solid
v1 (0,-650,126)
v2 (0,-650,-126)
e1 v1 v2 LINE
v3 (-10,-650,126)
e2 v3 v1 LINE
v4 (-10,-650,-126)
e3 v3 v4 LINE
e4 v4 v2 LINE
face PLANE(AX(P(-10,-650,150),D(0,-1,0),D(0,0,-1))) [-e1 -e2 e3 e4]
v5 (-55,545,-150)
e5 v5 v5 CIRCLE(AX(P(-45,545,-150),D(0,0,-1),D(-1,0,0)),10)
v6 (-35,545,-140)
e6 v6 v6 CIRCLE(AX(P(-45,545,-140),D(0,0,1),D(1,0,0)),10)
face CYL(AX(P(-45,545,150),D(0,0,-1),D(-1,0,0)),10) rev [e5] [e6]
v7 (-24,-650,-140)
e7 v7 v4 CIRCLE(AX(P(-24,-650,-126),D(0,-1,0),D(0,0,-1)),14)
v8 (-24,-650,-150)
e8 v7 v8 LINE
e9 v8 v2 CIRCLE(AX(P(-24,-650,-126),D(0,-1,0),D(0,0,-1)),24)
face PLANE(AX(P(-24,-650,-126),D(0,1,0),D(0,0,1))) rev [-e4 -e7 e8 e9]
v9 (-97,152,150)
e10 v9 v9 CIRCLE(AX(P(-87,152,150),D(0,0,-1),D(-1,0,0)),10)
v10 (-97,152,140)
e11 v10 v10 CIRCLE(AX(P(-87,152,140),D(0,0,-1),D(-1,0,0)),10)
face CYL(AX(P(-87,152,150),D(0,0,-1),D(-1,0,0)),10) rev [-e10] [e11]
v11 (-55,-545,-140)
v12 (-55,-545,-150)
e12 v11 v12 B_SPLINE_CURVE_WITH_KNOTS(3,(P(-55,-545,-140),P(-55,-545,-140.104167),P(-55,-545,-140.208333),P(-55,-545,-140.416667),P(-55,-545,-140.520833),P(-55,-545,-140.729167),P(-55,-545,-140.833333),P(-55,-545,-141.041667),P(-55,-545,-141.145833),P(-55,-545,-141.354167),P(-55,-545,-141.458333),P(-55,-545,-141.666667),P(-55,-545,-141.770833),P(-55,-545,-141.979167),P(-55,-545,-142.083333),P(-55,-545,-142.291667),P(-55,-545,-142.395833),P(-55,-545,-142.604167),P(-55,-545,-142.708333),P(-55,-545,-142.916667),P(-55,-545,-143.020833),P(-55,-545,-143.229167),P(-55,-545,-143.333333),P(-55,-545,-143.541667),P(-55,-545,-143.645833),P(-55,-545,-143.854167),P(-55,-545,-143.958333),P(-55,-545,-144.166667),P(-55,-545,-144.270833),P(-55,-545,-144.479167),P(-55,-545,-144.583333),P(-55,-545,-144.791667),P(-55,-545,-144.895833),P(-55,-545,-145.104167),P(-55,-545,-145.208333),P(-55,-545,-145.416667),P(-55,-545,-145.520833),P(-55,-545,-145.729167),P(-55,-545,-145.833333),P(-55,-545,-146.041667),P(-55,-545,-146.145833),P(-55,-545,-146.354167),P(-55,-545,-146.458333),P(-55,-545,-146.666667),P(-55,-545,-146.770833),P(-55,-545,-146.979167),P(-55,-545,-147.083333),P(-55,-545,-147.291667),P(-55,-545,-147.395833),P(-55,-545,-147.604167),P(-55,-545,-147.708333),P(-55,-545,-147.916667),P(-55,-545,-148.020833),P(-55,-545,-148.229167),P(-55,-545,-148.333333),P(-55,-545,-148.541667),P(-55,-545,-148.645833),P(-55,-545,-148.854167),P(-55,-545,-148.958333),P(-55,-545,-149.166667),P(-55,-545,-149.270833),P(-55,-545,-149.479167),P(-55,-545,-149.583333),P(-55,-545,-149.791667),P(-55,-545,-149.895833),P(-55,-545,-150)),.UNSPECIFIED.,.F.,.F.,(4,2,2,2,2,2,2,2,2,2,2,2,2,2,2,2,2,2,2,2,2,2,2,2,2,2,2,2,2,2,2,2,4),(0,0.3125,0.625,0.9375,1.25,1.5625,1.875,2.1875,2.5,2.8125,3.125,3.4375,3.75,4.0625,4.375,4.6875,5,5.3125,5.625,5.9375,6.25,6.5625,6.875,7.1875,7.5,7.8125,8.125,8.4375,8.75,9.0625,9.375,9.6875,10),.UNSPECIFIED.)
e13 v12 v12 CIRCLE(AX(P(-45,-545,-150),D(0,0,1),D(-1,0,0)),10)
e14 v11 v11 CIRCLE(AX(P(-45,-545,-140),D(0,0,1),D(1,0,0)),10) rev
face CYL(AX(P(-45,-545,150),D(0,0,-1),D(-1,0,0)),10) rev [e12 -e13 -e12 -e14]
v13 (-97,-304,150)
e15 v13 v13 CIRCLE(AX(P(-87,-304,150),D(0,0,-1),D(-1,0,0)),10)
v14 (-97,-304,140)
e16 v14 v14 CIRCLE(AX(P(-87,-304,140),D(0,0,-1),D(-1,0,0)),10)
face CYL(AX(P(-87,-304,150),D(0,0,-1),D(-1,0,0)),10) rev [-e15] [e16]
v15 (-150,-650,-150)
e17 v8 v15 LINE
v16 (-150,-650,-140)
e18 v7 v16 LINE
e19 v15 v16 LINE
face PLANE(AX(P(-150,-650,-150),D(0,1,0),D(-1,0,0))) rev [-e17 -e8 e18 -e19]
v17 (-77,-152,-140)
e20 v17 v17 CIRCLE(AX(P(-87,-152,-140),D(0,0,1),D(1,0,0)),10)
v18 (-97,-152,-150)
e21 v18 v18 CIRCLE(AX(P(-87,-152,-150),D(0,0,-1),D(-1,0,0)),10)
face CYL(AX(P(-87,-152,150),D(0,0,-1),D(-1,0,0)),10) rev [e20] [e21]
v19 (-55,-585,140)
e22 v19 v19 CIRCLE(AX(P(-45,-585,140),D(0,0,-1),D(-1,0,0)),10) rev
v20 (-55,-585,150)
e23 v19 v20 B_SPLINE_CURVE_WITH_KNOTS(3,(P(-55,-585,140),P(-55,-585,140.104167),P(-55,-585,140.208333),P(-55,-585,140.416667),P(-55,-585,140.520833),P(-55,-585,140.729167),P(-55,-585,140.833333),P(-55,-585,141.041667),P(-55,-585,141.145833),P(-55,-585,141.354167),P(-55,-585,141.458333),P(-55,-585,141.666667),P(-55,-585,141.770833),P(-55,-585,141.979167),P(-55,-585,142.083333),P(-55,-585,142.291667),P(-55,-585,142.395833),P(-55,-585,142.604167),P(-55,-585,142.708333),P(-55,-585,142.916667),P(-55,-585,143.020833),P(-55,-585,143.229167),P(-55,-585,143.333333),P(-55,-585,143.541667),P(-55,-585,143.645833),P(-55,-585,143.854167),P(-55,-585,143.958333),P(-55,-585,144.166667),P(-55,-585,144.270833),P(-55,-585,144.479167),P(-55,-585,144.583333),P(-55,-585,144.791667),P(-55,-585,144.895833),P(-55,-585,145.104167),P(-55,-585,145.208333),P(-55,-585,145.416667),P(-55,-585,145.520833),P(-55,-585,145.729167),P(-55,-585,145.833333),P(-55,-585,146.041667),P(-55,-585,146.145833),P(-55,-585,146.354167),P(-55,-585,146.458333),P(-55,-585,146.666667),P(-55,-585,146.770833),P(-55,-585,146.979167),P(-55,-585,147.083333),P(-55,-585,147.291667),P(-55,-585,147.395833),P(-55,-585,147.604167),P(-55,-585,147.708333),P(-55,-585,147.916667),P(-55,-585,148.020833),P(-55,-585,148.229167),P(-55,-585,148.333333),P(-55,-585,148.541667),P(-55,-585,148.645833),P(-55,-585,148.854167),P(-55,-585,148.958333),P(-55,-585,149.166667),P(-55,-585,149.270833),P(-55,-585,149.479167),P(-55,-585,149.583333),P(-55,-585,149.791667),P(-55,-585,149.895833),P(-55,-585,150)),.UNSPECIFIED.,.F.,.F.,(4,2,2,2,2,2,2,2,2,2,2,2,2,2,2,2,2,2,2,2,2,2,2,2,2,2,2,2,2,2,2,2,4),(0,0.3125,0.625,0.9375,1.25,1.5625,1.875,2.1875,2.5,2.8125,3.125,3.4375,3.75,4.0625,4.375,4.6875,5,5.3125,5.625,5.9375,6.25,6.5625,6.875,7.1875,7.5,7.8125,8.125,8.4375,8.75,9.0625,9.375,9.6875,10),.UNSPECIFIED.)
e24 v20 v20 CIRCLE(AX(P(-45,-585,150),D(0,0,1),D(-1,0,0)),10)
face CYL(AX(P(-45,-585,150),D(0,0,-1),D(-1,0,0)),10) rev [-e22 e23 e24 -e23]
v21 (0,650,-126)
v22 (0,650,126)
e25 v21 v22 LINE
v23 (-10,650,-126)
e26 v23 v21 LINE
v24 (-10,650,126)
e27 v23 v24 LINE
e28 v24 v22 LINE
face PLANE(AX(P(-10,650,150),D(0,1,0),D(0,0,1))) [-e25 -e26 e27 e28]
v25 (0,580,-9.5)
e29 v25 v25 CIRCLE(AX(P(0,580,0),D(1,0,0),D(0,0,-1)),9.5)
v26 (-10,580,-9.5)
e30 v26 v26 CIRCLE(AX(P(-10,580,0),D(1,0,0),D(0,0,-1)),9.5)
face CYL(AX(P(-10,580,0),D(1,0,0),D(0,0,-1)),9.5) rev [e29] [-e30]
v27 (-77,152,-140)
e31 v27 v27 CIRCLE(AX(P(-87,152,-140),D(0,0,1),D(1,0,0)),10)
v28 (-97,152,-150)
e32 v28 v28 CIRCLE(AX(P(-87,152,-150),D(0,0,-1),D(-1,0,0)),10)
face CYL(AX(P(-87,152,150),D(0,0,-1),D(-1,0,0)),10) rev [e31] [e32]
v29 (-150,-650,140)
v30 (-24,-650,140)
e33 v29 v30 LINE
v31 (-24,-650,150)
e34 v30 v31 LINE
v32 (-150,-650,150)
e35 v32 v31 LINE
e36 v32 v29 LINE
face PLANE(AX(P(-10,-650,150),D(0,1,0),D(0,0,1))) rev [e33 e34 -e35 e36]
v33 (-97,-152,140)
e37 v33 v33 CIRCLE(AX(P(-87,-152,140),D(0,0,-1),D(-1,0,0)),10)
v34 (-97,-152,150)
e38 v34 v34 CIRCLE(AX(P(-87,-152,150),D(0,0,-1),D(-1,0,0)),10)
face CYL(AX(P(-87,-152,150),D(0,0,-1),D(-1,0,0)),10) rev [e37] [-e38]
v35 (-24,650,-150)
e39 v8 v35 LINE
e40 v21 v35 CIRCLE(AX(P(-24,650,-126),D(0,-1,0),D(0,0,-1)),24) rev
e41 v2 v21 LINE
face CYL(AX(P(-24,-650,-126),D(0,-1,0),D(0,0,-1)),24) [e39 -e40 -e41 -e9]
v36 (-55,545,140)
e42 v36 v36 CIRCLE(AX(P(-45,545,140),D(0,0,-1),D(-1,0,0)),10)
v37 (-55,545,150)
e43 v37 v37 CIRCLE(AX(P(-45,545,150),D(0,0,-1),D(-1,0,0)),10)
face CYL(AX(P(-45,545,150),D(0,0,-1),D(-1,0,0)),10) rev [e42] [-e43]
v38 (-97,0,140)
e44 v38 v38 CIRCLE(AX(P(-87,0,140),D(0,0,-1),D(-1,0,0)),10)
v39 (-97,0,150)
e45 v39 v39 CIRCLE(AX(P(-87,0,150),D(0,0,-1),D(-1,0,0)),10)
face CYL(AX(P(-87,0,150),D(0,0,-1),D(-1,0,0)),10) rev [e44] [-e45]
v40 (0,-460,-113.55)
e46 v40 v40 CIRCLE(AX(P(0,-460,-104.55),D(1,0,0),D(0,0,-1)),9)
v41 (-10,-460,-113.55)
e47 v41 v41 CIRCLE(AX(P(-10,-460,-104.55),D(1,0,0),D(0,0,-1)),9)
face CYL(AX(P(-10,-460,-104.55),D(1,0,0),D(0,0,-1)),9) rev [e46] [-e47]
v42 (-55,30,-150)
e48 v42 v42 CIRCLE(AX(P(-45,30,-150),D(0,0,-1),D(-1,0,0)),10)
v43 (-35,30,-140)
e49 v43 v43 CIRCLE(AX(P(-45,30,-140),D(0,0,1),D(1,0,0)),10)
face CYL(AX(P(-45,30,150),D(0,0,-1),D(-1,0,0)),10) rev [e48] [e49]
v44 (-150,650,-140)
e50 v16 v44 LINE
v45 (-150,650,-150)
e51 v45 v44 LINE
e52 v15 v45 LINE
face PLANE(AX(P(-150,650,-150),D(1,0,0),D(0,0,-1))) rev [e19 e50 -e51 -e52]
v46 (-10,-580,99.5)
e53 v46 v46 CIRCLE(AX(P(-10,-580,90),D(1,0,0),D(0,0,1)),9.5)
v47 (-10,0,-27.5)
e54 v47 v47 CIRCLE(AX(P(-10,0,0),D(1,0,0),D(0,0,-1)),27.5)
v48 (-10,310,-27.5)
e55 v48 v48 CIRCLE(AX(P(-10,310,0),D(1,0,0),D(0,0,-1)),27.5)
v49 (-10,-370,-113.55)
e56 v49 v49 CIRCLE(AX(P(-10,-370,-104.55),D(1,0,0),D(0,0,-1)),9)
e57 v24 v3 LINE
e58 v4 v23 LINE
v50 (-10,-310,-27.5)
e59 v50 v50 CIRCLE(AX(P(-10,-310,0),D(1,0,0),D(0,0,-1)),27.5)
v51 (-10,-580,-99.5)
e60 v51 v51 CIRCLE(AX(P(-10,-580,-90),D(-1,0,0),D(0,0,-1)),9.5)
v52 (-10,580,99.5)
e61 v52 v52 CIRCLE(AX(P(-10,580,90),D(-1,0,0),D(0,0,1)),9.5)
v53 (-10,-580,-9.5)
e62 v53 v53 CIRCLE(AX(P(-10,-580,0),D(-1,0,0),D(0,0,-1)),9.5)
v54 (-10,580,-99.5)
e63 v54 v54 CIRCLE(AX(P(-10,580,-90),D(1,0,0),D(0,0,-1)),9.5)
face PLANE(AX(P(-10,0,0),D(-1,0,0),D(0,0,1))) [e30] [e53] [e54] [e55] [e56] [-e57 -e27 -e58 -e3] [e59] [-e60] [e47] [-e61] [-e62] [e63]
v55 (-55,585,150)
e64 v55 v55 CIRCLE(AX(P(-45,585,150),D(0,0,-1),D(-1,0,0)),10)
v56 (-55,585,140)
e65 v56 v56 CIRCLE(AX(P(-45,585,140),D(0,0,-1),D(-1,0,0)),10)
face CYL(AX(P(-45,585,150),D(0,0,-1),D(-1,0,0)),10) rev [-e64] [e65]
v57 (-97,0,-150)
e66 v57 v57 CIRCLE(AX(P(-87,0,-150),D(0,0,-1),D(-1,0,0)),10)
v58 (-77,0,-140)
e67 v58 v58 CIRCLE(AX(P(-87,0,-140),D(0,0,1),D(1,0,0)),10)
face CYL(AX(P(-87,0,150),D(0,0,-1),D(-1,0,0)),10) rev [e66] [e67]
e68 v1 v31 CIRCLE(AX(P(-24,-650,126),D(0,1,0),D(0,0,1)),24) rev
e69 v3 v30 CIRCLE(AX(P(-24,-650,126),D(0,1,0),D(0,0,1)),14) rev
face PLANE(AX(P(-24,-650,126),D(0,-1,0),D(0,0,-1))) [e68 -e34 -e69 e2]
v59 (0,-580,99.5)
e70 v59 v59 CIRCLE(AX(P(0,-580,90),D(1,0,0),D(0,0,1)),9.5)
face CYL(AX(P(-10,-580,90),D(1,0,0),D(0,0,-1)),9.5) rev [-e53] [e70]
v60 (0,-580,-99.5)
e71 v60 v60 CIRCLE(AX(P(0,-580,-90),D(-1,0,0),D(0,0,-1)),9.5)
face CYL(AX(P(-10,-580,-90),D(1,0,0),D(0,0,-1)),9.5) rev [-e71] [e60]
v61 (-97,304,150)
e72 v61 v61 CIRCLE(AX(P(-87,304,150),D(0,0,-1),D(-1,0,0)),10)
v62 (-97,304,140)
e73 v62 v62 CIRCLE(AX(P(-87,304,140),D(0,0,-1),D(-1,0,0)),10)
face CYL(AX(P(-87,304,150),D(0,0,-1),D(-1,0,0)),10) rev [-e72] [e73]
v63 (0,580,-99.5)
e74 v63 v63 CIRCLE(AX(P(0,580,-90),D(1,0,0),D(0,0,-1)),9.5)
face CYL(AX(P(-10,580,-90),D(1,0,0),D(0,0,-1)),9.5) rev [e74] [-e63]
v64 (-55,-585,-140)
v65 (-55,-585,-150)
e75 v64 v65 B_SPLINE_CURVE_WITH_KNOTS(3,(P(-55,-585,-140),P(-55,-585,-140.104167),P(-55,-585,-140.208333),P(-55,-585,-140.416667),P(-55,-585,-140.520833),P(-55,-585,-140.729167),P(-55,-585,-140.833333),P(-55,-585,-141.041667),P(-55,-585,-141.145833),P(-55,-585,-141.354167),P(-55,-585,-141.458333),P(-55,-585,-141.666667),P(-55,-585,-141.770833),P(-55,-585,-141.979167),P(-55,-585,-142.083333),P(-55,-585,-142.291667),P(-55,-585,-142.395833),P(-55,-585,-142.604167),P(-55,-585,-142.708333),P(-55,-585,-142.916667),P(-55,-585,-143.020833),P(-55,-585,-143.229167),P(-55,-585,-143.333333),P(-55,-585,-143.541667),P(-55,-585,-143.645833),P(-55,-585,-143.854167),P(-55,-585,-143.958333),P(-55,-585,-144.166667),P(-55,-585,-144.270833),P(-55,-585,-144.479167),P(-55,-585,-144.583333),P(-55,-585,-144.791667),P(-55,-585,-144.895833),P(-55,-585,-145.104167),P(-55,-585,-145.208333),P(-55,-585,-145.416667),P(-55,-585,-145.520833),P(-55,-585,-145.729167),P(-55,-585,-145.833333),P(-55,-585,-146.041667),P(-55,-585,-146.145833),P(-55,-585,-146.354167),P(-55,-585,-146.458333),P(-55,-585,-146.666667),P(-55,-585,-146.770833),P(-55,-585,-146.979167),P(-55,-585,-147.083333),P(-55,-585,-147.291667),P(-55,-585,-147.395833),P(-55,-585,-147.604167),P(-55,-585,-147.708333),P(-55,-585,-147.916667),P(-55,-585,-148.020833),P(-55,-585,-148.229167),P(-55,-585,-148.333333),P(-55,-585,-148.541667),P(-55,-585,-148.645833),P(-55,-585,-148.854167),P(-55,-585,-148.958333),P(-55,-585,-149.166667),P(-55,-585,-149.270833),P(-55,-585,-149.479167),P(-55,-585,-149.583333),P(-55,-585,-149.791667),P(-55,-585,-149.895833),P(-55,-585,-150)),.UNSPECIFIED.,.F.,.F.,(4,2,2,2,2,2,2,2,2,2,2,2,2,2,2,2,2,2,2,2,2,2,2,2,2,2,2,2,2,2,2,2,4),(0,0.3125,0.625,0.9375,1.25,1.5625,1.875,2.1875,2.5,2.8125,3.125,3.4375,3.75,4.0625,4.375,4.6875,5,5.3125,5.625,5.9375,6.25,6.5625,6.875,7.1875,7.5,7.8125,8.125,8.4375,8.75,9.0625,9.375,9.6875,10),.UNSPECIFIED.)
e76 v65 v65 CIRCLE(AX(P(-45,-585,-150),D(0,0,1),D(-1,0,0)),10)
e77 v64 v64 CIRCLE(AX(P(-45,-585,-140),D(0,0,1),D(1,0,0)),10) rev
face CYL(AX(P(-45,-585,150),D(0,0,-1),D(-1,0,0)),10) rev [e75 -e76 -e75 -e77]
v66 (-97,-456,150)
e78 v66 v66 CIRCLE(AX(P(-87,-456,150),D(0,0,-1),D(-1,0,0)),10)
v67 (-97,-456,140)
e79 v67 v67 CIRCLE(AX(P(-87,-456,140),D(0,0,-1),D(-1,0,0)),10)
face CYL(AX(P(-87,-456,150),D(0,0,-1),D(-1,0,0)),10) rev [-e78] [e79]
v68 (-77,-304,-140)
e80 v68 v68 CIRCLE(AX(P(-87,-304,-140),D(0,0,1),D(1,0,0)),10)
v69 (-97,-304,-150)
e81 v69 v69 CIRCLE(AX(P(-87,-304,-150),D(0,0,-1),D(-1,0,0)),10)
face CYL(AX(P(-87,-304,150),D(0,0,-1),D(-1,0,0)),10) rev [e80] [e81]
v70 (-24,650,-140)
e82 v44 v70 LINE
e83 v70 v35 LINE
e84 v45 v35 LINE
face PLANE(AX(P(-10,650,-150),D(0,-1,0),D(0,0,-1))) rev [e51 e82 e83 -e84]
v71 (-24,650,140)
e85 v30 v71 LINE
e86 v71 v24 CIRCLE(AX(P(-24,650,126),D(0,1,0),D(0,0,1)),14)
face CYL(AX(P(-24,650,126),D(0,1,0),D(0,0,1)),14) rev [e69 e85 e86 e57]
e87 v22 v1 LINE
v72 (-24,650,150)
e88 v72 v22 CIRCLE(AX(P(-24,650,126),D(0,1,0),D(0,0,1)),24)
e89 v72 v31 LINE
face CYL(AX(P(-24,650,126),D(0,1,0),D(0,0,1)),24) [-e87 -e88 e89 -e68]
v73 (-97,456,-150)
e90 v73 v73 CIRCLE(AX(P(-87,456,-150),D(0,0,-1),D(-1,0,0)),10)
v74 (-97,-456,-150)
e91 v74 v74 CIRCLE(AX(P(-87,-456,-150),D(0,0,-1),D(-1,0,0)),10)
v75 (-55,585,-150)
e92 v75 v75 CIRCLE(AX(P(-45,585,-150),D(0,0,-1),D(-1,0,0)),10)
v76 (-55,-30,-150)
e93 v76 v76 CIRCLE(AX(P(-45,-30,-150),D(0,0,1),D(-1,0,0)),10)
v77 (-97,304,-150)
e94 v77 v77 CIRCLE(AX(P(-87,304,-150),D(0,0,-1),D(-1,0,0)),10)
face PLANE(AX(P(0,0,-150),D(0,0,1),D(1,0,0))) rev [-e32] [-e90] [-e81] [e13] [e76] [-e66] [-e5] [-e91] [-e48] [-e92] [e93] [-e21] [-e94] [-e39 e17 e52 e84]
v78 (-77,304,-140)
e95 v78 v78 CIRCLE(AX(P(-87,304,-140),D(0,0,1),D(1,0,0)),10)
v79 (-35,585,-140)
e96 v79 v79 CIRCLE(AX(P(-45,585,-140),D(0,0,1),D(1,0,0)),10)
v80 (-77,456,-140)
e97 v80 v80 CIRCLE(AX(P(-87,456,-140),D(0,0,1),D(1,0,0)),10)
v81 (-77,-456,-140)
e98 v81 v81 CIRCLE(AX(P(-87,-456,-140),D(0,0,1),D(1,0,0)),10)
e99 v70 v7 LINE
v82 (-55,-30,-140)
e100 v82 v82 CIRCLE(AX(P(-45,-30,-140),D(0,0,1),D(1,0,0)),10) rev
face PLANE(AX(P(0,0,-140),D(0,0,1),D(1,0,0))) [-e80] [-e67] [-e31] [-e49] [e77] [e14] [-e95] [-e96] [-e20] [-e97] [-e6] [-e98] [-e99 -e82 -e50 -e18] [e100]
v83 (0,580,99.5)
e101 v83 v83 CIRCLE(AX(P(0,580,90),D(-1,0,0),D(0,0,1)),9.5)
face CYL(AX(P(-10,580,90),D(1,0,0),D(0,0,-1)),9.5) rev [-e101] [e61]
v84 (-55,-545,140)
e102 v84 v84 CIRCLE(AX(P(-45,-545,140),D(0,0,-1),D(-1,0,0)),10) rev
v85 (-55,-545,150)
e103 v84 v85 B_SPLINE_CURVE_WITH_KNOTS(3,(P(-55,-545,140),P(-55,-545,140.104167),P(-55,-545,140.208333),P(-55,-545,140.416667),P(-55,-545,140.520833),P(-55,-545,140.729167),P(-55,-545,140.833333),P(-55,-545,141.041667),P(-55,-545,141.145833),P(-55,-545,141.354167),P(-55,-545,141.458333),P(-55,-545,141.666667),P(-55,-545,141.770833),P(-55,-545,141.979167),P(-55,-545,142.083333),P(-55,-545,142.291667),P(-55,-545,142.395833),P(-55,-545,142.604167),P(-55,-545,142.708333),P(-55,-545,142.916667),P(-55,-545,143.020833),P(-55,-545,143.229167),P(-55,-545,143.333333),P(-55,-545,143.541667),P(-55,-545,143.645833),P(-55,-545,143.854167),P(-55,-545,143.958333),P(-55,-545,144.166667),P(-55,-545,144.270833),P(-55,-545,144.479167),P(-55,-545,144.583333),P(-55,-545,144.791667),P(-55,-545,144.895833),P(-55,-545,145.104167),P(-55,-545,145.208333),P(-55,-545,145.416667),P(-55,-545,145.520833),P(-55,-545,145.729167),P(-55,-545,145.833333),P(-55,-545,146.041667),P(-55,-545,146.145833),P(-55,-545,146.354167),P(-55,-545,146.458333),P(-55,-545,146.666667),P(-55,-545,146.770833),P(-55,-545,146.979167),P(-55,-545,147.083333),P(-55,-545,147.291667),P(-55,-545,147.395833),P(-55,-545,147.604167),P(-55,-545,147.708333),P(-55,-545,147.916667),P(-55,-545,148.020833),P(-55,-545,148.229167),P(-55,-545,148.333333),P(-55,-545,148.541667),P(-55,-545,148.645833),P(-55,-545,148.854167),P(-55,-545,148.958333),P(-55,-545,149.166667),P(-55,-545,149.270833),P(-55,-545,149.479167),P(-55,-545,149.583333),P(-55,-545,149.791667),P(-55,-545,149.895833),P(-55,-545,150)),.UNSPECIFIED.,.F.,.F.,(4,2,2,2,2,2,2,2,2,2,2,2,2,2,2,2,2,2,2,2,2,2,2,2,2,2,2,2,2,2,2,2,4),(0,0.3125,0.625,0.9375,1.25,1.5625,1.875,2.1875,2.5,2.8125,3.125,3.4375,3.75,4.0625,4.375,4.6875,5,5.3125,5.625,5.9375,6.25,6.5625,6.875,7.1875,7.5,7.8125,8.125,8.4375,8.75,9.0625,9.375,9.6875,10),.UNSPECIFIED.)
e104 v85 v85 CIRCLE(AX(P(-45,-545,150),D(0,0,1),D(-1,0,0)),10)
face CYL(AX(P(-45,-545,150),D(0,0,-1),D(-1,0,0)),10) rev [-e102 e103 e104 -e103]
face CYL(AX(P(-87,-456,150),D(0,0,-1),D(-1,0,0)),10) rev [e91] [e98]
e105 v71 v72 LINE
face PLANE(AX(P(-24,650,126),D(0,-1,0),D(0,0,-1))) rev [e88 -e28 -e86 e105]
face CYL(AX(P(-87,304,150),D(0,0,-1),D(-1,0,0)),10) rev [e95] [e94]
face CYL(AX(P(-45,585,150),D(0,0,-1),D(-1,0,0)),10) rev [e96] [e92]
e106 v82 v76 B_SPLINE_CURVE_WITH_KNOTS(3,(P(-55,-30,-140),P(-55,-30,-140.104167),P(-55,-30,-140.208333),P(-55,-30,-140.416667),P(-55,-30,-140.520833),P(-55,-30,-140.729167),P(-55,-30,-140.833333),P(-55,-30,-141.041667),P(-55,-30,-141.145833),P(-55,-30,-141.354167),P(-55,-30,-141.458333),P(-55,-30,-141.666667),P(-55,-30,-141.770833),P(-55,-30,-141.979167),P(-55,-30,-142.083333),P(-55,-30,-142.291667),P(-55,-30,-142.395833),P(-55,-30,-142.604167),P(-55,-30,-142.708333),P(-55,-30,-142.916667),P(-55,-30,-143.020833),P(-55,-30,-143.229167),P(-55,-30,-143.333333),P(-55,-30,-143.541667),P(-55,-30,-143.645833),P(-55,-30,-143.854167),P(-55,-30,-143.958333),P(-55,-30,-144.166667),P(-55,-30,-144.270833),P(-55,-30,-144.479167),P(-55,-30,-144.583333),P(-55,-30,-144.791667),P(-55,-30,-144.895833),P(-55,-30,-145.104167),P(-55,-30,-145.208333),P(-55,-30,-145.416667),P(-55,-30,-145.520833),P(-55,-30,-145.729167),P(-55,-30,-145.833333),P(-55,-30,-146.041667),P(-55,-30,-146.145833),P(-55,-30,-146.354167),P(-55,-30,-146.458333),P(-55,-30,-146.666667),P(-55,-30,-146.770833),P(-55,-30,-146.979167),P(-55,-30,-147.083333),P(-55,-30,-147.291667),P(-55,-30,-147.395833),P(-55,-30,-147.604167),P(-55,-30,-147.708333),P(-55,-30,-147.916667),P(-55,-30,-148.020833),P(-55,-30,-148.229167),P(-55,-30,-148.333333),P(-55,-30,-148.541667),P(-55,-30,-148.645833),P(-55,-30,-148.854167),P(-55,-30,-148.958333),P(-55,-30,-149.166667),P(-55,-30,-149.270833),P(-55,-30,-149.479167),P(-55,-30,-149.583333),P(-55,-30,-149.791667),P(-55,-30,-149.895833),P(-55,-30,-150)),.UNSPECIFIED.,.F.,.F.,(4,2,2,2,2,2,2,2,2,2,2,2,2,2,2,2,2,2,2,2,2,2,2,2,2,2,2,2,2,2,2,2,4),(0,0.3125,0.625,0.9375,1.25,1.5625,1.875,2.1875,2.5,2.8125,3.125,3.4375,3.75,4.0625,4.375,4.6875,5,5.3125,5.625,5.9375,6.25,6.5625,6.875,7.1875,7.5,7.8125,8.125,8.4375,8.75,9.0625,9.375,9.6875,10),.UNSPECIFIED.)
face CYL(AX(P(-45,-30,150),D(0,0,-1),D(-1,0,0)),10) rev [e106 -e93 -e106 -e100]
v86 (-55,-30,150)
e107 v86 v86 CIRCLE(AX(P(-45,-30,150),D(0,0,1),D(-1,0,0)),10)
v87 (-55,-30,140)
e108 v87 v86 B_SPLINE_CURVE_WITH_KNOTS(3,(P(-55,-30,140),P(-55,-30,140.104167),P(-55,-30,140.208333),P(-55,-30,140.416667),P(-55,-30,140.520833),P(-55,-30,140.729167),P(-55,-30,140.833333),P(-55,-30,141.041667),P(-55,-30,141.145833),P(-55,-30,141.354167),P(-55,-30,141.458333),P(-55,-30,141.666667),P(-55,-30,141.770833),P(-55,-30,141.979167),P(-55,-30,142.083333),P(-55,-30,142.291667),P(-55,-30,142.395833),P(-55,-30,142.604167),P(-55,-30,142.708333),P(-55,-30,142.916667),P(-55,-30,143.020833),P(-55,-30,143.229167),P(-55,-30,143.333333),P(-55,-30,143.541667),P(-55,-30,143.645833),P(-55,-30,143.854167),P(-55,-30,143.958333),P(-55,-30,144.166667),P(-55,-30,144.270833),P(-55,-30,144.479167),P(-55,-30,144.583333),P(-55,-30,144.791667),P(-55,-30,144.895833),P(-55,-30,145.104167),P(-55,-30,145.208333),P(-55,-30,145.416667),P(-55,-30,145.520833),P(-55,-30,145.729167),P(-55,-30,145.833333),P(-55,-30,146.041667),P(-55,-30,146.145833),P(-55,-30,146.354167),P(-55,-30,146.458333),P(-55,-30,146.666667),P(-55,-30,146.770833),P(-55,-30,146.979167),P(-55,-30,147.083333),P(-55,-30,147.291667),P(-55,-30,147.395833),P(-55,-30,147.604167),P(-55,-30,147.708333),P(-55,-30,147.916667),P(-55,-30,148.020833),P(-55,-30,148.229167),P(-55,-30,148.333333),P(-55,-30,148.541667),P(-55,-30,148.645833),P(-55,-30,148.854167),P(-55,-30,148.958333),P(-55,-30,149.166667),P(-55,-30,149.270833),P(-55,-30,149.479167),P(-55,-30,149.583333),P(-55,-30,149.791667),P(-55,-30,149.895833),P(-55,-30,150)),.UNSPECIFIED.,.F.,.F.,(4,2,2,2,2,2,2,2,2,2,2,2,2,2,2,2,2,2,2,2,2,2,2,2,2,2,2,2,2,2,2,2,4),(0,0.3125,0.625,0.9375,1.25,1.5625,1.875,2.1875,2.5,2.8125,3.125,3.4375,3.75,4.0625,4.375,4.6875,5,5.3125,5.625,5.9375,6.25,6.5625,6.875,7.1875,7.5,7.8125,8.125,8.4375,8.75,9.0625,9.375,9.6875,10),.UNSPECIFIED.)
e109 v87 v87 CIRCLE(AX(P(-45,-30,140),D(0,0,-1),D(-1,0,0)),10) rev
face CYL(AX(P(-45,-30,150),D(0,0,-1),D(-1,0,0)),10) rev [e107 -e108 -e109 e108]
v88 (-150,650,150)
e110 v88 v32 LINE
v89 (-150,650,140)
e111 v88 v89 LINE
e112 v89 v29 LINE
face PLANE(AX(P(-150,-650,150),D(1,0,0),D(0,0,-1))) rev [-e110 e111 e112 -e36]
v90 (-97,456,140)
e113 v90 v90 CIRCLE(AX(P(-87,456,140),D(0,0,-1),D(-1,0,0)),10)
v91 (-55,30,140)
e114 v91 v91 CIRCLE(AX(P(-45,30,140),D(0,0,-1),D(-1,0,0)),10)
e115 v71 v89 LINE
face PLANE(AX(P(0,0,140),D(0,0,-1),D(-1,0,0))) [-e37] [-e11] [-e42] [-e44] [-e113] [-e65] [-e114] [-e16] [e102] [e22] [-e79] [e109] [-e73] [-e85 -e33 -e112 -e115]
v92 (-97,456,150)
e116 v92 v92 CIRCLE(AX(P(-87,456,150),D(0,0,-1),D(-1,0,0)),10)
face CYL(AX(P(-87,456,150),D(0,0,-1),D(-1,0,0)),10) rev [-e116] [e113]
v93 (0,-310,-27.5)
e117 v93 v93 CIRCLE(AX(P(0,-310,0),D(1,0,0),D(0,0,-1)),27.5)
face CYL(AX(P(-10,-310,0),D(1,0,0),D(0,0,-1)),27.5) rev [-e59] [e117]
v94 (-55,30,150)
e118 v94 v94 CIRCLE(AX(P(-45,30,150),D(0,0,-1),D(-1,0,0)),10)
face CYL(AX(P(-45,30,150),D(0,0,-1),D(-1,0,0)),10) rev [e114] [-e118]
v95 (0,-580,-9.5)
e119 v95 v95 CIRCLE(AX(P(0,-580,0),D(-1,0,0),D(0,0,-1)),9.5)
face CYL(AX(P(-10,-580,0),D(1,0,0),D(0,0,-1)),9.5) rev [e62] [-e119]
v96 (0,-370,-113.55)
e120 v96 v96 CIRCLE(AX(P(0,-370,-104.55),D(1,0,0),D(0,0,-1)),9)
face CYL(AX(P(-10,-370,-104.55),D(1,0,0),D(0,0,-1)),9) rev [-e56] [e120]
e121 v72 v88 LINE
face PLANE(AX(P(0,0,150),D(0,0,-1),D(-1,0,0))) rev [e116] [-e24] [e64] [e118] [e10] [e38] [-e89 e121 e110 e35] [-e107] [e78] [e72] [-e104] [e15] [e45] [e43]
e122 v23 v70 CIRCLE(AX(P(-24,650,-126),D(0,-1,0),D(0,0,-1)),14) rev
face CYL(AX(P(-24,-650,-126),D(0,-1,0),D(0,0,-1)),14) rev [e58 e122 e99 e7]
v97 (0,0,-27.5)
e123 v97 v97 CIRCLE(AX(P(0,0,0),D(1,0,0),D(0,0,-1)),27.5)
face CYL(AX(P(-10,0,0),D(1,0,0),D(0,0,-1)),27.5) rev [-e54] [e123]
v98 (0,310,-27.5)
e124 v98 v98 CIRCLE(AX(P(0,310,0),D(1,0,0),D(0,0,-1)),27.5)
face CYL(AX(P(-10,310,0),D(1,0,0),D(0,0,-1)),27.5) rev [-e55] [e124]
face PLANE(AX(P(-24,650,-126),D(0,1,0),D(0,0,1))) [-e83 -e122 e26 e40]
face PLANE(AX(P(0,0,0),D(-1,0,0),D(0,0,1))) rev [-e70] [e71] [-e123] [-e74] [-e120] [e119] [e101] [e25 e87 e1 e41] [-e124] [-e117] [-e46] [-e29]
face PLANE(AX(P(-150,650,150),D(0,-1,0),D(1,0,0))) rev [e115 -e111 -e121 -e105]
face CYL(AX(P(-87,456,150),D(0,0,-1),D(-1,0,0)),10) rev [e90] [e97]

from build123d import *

# Parameters (mm, degrees)
SKETCH1_W                      = 300
SKETCH1_H                      = 1300
BASE_FLANGE1_DEPTH             = 10
EDGE_FLANGE1_STRIP_W           = 68
EDGE_FLANGE1_STRIP_H           = 10
EDGE_FLANGE1_STRIP_CUT_DEPTH   = 1300
EDGE_FLANGE1_STRIP_2_W         = 68
EDGE_FLANGE1_STRIP_2_H         = 10
EDGE_FLANGE1_STRIP_CUT_2_DEPTH = 1300
EDGE_FLANGE1_DEPTH             = 1300
EDGE_FLANGE1_BEND_DEPTH        = 1300
SKETCH12_R                     = 9.5
CUT_EXTRUDE1_DEPTH             = 10
MIRROR2_COPY_1_SKETCH_R        = 9.5
MIRROR2_COPY_1_DEPTH           = 10
SKETCH13_R                     = 27.5
CUT_EXTRUDE2_DEPTH             = 10
LPATTERN1_COUNT                = 3
LPATTERN1_PITCH                = 310
SKETCH14_R                     = 10
CUT_EXTRUDE3_DEPTH             = 732.436941916
LPATTERN2_COUNT                = 7
LPATTERN2_PITCH                = 152
SKETCH18_R                     = 10
CUT_EXTRUDE4_DEPTH             = 732.436941916
SKETCH20_R                     = 9
CUT_EXTRUDE5_DEPTH             = 10


# Sheet-metal steps are written as plain solids
with BuildPart() as part:
    # Sketch1 → Base-Flange1 (new body)
    with BuildSketch(Plane(origin=(0, 0, 0), x_dir=(0, 0, -1), z_dir=(1, 0, 0))):
        Rectangle(SKETCH1_W, SKETCH1_H)
    extrude(amount=-BASE_FLANGE1_DEPTH)

    # Edge-Flange1 strip (across the edge) → Edge-Flange1 strip cut (cut)
    with BuildSketch(Plane(origin=(-10, -650, 150), x_dir=(0, 0, -1), z_dir=(0, 1, 0))):
        with Locations((-10, -5)):
            Rectangle(EDGE_FLANGE1_STRIP_W, EDGE_FLANGE1_STRIP_H)
    extrude(amount=EDGE_FLANGE1_STRIP_CUT_DEPTH, mode=Mode.SUBTRACT)

    # Edge-Flange1 strip 2 (across the edge) → Edge-Flange1 strip cut 2 (cut)
    with BuildSketch(Plane(origin=(-10, 650, -150), x_dir=(0, 0, 1), z_dir=(0, -1, 0))):
        with Locations((-10, -5)):
            Rectangle(EDGE_FLANGE1_STRIP_2_W, EDGE_FLANGE1_STRIP_2_H)
    extrude(amount=EDGE_FLANGE1_STRIP_CUT_2_DEPTH, mode=Mode.SUBTRACT)

    # Edge-Flange1 section (across the edge) → Edge-Flange1 (add)
    with BuildSketch(Plane(origin=(-10, -650, 150), x_dir=(0, 0, -1), z_dir=(0, 1, 0))):
        with BuildLine():
            Line((0, 14), (0, 140))
            Line((0, 140), (10, 140))
            Line((10, 140), (10, 14))
            ThreePointArc((10, 14), (14.100505063, 4.100505063), (24, 0))
            Line((24, 0), (24, -10))
            ThreePointArc((24, -10), (7.029437252, -2.970562748), (0, 14))
        make_face()
    extrude(amount=EDGE_FLANGE1_DEPTH)

    # Edge-Flange1 section 2 (across the edge) → Edge-Flange1 bend (add)
    with BuildSketch(Plane(origin=(-10, 650, -150), x_dir=(0, 0, 1), z_dir=(0, -1, 0))):
        with BuildLine():
            Line((0, 14), (0, 140))
            Line((0, 140), (10, 140))
            Line((10, 140), (10, 14))
            ThreePointArc((10, 14), (14.100505063, 4.100505063), (24, 0))
            Line((24, 0), (24, -10))
            ThreePointArc((24, -10), (7.029437252, -2.970562748), (0, 14))
        make_face()
    extrude(amount=EDGE_FLANGE1_BEND_DEPTH)

    # Sketch12 → Cut-Extrude1 (cut)
    with BuildSketch(Plane(origin=(0, 0, 0), x_dir=(0, 0, -1), z_dir=(1, 0, 0))):
        with Locations((90, 580)):
            Circle(SKETCH12_R)
        with Locations((0, 580)):
            Circle(SKETCH12_R)
    cut_extrude1 = extrude(amount=-CUT_EXTRUDE1_DEPTH, mode=Mode.SUBTRACT)

    # Mirror1: Cut-Extrude1 across plane
    add(cut_extrude1.mirror(Plane.ZX), mode=Mode.SUBTRACT)

    # Mirror2: Cut-Extrude1 across plane
    add(cut_extrude1.mirror(Plane.XY), mode=Mode.SUBTRACT)

    # Mirror2 copy 1 sketch → Mirror2 copy 1 (cut)
    with BuildSketch(Plane(origin=(0, 0, 0), x_dir=(0, 0, 1), z_dir=(1, 0, 0))):
        with Locations((90, 580)):
            Circle(MIRROR2_COPY_1_SKETCH_R)
        with Locations((0, 580)):
            Circle(MIRROR2_COPY_1_SKETCH_R)
    extrude(amount=-MIRROR2_COPY_1_DEPTH, mode=Mode.SUBTRACT)

    # Sketch13 → Cut-Extrude2 (cut)
    with BuildSketch(Plane(origin=(0, 0, 0), x_dir=(0, 0, -1), z_dir=(1, 0, 0))):
        with Locations((0, 310)):
            Circle(SKETCH13_R)
    cut_extrude2 = extrude(amount=-CUT_EXTRUDE2_DEPTH, mode=Mode.SUBTRACT)

    # LPattern1: Cut-Extrude2 ×3
    with Locations(*[(0, -i * LPATTERN1_PITCH, 0) for i in range(1, LPATTERN1_COUNT)]):
        add(cut_extrude2, mode=Mode.SUBTRACT)

    # Sketch14 → Cut-Extrude3 (cut, through all)
    with BuildSketch(Plane(origin=(0, 0, -150), x_dir=(-1, 0, 0), z_dir=(0, 0, -1))):
        with Locations((87, -456)):
            Circle(SKETCH14_R)
    cut_extrude3 = extrude(amount=-CUT_EXTRUDE3_DEPTH, mode=Mode.SUBTRACT)

    # LPattern2: Cut-Extrude3 ×7
    with Locations(*[(0, i * LPATTERN2_PITCH, 0) for i in range(1, LPATTERN2_COUNT)]):
        add(cut_extrude3, mode=Mode.SUBTRACT)

    # Sketch18 → Cut-Extrude4 (cut, through all)
    with BuildSketch(Plane(origin=(0, 0, -150), x_dir=(-1, 0, 0), z_dir=(0, 0, -1))):
        with Locations((45, 545)):
            Circle(SKETCH18_R)
        with Locations((45, 585)):
            Circle(SKETCH18_R)
        with Locations((45, 30)):
            Circle(SKETCH18_R)
    cut_extrude4 = extrude(amount=-CUT_EXTRUDE4_DEPTH, mode=Mode.SUBTRACT)

    # Mirror3: Cut-Extrude4 across plane
    add(cut_extrude4.mirror(Plane.ZX), mode=Mode.SUBTRACT)

    # Sketch20 → Cut-Extrude5 (cut)
    with BuildSketch(Plane(origin=(0, 0, 0), x_dir=(0, 0, -1), z_dir=(1, 0, 0))):
        with Locations((104.55, -370)):
            Circle(SKETCH20_R)
        with Locations((104.55, -460)):
            Circle(SKETCH20_R)
    extrude(amount=-CUT_EXTRUDE5_DEPTH, mode=Mode.SUBTRACT)


solid = part.part
